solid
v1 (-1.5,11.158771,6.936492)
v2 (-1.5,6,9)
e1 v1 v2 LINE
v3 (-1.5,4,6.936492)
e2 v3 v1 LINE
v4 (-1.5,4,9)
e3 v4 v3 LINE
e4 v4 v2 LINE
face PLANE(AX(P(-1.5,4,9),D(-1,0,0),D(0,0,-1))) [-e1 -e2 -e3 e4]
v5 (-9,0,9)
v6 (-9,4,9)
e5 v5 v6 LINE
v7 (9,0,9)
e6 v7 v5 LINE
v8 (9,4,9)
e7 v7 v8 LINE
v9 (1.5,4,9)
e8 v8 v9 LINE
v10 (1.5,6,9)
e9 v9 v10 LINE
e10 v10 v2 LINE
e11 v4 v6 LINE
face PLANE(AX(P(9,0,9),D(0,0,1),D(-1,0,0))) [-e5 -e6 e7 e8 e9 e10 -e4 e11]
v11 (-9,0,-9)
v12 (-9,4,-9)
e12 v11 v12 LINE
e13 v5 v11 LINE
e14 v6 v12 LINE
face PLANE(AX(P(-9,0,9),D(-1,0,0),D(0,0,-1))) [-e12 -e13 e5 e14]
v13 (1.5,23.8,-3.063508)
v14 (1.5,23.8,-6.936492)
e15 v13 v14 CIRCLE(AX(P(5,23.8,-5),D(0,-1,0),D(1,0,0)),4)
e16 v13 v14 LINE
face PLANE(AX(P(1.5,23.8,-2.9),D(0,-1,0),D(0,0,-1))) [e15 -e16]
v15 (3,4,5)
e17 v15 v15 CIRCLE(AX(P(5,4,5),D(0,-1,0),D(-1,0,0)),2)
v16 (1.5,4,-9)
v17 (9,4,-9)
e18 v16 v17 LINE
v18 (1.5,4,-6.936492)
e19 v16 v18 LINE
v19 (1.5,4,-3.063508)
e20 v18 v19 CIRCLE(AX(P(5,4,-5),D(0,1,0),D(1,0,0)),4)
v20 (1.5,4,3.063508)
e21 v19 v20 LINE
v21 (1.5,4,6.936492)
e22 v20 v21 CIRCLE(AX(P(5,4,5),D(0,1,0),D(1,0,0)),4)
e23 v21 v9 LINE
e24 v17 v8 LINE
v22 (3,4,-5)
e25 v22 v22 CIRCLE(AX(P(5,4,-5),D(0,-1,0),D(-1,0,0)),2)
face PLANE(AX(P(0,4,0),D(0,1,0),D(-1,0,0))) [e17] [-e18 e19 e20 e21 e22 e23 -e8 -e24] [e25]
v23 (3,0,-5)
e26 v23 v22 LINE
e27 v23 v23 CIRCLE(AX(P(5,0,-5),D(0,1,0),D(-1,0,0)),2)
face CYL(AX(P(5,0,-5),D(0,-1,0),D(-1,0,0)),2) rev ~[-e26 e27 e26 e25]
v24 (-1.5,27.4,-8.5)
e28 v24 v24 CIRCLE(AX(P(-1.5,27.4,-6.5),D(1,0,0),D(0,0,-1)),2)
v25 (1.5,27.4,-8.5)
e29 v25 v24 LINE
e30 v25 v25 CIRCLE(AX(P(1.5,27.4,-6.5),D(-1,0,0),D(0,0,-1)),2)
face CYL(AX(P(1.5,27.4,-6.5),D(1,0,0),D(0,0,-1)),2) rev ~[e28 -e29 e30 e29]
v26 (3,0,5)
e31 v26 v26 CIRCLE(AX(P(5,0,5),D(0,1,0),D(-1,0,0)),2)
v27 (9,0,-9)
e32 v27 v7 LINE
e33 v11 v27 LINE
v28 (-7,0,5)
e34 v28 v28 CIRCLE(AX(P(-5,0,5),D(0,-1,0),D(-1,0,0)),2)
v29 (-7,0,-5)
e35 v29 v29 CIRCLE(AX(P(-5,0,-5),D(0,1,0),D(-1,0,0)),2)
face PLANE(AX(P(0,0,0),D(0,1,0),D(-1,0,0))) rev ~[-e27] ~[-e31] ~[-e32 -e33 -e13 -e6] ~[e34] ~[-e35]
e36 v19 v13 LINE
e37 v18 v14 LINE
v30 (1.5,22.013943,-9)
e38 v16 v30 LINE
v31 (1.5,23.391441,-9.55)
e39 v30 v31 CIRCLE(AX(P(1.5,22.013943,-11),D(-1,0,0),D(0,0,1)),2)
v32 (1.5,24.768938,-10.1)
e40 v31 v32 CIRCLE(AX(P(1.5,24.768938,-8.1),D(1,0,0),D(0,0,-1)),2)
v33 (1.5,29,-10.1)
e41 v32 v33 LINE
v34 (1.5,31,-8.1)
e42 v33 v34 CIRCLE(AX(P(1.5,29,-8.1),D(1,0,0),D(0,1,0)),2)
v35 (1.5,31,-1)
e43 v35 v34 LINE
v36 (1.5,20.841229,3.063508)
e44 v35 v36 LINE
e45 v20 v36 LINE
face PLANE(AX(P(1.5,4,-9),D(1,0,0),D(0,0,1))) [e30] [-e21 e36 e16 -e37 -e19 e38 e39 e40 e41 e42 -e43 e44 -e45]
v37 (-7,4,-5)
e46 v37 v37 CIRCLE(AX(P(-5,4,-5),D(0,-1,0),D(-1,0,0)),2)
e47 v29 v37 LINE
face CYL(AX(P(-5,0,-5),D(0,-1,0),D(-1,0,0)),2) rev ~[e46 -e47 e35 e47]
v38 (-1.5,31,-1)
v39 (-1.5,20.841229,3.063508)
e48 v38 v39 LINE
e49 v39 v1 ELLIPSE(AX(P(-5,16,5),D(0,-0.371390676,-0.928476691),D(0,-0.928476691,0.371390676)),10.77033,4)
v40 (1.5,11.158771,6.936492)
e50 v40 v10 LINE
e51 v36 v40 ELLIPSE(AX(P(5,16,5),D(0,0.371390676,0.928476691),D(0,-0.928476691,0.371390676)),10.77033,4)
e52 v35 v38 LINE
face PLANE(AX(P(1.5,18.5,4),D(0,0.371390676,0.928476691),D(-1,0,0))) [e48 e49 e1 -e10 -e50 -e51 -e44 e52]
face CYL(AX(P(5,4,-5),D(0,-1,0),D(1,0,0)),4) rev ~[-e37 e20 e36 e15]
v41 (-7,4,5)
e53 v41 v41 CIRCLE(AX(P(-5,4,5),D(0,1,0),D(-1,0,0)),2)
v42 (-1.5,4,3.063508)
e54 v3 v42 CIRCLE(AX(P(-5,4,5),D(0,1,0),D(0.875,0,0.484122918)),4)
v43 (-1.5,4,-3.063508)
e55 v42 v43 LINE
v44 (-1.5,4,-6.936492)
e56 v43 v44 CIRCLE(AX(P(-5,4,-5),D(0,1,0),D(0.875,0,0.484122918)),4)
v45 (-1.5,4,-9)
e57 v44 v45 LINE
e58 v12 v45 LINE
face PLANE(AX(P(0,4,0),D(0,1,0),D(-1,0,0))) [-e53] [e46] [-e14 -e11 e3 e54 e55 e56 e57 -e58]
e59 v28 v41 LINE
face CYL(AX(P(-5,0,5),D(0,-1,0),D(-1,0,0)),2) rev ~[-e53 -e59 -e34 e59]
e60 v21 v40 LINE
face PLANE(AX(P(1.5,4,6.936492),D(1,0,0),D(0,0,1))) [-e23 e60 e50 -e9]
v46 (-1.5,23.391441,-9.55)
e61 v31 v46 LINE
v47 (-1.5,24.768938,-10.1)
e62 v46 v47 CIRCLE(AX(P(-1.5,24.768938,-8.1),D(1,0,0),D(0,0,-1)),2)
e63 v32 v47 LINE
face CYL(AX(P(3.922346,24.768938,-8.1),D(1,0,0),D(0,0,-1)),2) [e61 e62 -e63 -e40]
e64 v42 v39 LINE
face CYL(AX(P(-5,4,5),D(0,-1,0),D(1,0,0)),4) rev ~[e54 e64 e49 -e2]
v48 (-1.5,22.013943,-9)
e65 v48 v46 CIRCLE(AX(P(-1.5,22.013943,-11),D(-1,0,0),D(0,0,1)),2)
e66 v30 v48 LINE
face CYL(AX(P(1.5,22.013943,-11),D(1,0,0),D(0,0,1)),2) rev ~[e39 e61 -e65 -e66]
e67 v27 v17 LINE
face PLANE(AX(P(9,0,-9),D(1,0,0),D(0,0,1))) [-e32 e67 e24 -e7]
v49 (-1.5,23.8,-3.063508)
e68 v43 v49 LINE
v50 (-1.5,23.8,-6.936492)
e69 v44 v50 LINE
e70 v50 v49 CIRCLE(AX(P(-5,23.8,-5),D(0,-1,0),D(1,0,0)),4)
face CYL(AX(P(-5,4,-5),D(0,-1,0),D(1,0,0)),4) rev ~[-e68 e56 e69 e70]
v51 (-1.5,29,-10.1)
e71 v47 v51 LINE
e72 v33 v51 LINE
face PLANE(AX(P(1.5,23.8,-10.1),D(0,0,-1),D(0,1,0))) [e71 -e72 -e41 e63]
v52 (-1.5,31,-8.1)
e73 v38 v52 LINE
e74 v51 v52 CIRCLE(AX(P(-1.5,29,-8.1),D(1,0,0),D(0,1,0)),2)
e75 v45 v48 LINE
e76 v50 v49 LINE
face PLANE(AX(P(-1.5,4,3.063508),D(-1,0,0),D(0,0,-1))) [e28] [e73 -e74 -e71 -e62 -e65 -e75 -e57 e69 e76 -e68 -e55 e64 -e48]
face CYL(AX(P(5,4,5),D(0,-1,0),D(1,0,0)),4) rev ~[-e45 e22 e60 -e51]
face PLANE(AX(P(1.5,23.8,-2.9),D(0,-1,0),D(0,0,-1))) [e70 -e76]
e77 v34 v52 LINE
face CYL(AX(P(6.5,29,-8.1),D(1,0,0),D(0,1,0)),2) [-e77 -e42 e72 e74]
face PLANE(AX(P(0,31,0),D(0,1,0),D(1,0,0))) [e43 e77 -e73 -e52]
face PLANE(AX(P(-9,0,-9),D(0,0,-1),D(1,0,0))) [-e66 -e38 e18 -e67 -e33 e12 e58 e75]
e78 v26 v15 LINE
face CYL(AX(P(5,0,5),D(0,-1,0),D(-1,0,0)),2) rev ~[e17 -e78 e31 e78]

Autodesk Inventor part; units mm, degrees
ref_plane "YZ Plane" through (0, 0, 0) normal (1, 0, 0) x (0, 1, 0)
ref_plane "XZ Plane" through (0, 0, 0) normal (0, 1, 0) x (-1, 0, 0)
ref_plane "XY Plane" through (0, 0, 0) normal (0, 0, 1) x (1, 0, 0)
sketch "Sketch1" plane through (0, 0, 0) normal (0, 1, 0) x (-1, 0, 0)
  line L0 (-5, 5) -> (5, 5)
  line L1 (5, 5) -> (5, -5)
  line L2 (5, -5) -> (-5, -5)
  line L3 (-5, -5) -> (-5, 5)
  line L4 (-5, 5) -> (5, -5) construction
  line L5 (5, 5) -> (-5, -5) construction
  circle A0 centre (5, 5) radius 2
  circle A1 centre (5, -5) radius 2
  circle A2 centre (-5, 5) radius 2
  circle A3 centre (-5, -5) radius 2
  line L6 (-9, 9) -> (9, 9)
  line L7 (9, 9) -> (9, -9)
  line L8 (9, -9) -> (-9, -9)
  line L9 (-9, -9) -> (-9, 9)
  line L10 (-9, 9) -> (9, -9) construction
  line L11 (9, 9) -> (-9, -9) construction
  point P0 (0, 0)
  dimension "d0" = 10
  dimension "d1" = 10
  dimension "d2" = 4
  dimension "d3" = 4
  dimension "d4" = 4
  dimension "d5" = 4
  dimension "d6" = 18
  dimension "d7" = 18
extrude "Extrusion1" add sketch "Sketch1" along normal blind 4 contours L0 A0 L1 A1 L2 A3 L3 A2 | L6 L7 L8 L9
sketch "Sketch2" plane through (0, 4, 0) normal (0, 1, 0) x (1, 0, 0)
  line L0 (9, 9) -> (-9, 9) projected
  line L1 (1.5, -9) -> (-1.5, -9)
  line L2 (-1.5, -9) -> (-1.5, 9)
  line L3 (-1.5, 9) -> (1.5, 9)
  line L4 (1.5, 9) -> (1.5, -9)
  line L5 (1.5, -9) -> (-1.5, 9) construction
  line L6 (-1.5, -9) -> (1.5, 9) construction
  circle A0 centre (-5, -5) radius 2 projected
  circle A1 centre (-5, -5) radius 4
  circle A2 centre (-5, 5) radius 2 projected
  circle A3 centre (-5, 5) radius 4
  circle A4 centre (5, -5) radius 2 projected
  circle A5 centre (5, -5) radius 4
  circle A6 centre (5, 5) radius 2 projected
  circle A7 centre (5, 5) radius 4
  point P0 (0, 0)
  point P1 (1.5, -6.9365)
  point P2 (1.5, -3.0635)
  point P3 (1.5, 3.0635)
  point P4 (1.5, 6.9365)
  point P5 (-1.5, 6.9365)
  point P6 (-1.5, 3.0635)
  point P7 (-1.5, -3.0635)
  point P8 (-1.5, -6.9365)
  dimension "d10" = 3
  dimension "d11" = 8
  dimension "d12" = 8
  dimension "d13" = 8
  dimension "d14" = 8
extrude "Extrusion2" add sketch "Sketch2" along normal blind 27 contours L4 A7 A5 L1 L2 A1 A3 L0
sketch "Sketch3" plane through (1.5, 4, 3.0635) normal (1, 0, 0) x (0, 0, -1)
  line L0 (-5.9365, -4) -> (-5.9365, 0) projected
  line L1 (-5.9365, -4) -> (-5.9365, 23.4)
  line L2 (-5.9365, 0) -> (-5.9365, 27) projected
  line L3 (-5.9365, 23.4) -> (12.0635, 23.4)
  line L4 (12.0635, 0) -> (12.0635, 27) projected
  line L5 (12.0635, 23.4) -> (9.5635, 23.4)
  circle A0 centre (9.5635, 23.4) radius 2
  line L6 (5.9635, 19.8) -> (13.1635, 19.8)
  line L7 (13.1635, 19.8) -> (13.1635, 27)
  line L8 (13.1635, 27) -> (5.9635, 27)
  line L9 (5.9635, 27) -> (5.9635, 19.8)
  line L10 (5.9635, 19.8) -> (13.1635, 27) construction
  line L11 (13.1635, 19.8) -> (5.9635, 27) construction
  point P0 (3.0635, -4)
  dimension "d17" = 27.4
  dimension "d18" = 2.5
  dimension "d19" = 4
  dimension "d20" = 7.2
extrude "Extrusion3" add sketch "Sketch3" against normal up to surface (3 mm away) contours A0 L3 L9 L8 L4 | L3 L4 L6 L9 A0 | L4 L8 L7 L6
extrude "Extrusion4" cut sketch "Sketch3" against normal blind 10 contours L3 A0 | L3 A0
chamfer "Chamfer1" distance 10 distance2 25 1 edges at (0, 31, 9) measured on face at (-0.5, 31, -5.7122)
fillet "Fillet1" radius 2 3 edges at (0, 31, -10.1) (0, 23.8, -10.1) (0, 23.8, -9)
properties part number "link1"
